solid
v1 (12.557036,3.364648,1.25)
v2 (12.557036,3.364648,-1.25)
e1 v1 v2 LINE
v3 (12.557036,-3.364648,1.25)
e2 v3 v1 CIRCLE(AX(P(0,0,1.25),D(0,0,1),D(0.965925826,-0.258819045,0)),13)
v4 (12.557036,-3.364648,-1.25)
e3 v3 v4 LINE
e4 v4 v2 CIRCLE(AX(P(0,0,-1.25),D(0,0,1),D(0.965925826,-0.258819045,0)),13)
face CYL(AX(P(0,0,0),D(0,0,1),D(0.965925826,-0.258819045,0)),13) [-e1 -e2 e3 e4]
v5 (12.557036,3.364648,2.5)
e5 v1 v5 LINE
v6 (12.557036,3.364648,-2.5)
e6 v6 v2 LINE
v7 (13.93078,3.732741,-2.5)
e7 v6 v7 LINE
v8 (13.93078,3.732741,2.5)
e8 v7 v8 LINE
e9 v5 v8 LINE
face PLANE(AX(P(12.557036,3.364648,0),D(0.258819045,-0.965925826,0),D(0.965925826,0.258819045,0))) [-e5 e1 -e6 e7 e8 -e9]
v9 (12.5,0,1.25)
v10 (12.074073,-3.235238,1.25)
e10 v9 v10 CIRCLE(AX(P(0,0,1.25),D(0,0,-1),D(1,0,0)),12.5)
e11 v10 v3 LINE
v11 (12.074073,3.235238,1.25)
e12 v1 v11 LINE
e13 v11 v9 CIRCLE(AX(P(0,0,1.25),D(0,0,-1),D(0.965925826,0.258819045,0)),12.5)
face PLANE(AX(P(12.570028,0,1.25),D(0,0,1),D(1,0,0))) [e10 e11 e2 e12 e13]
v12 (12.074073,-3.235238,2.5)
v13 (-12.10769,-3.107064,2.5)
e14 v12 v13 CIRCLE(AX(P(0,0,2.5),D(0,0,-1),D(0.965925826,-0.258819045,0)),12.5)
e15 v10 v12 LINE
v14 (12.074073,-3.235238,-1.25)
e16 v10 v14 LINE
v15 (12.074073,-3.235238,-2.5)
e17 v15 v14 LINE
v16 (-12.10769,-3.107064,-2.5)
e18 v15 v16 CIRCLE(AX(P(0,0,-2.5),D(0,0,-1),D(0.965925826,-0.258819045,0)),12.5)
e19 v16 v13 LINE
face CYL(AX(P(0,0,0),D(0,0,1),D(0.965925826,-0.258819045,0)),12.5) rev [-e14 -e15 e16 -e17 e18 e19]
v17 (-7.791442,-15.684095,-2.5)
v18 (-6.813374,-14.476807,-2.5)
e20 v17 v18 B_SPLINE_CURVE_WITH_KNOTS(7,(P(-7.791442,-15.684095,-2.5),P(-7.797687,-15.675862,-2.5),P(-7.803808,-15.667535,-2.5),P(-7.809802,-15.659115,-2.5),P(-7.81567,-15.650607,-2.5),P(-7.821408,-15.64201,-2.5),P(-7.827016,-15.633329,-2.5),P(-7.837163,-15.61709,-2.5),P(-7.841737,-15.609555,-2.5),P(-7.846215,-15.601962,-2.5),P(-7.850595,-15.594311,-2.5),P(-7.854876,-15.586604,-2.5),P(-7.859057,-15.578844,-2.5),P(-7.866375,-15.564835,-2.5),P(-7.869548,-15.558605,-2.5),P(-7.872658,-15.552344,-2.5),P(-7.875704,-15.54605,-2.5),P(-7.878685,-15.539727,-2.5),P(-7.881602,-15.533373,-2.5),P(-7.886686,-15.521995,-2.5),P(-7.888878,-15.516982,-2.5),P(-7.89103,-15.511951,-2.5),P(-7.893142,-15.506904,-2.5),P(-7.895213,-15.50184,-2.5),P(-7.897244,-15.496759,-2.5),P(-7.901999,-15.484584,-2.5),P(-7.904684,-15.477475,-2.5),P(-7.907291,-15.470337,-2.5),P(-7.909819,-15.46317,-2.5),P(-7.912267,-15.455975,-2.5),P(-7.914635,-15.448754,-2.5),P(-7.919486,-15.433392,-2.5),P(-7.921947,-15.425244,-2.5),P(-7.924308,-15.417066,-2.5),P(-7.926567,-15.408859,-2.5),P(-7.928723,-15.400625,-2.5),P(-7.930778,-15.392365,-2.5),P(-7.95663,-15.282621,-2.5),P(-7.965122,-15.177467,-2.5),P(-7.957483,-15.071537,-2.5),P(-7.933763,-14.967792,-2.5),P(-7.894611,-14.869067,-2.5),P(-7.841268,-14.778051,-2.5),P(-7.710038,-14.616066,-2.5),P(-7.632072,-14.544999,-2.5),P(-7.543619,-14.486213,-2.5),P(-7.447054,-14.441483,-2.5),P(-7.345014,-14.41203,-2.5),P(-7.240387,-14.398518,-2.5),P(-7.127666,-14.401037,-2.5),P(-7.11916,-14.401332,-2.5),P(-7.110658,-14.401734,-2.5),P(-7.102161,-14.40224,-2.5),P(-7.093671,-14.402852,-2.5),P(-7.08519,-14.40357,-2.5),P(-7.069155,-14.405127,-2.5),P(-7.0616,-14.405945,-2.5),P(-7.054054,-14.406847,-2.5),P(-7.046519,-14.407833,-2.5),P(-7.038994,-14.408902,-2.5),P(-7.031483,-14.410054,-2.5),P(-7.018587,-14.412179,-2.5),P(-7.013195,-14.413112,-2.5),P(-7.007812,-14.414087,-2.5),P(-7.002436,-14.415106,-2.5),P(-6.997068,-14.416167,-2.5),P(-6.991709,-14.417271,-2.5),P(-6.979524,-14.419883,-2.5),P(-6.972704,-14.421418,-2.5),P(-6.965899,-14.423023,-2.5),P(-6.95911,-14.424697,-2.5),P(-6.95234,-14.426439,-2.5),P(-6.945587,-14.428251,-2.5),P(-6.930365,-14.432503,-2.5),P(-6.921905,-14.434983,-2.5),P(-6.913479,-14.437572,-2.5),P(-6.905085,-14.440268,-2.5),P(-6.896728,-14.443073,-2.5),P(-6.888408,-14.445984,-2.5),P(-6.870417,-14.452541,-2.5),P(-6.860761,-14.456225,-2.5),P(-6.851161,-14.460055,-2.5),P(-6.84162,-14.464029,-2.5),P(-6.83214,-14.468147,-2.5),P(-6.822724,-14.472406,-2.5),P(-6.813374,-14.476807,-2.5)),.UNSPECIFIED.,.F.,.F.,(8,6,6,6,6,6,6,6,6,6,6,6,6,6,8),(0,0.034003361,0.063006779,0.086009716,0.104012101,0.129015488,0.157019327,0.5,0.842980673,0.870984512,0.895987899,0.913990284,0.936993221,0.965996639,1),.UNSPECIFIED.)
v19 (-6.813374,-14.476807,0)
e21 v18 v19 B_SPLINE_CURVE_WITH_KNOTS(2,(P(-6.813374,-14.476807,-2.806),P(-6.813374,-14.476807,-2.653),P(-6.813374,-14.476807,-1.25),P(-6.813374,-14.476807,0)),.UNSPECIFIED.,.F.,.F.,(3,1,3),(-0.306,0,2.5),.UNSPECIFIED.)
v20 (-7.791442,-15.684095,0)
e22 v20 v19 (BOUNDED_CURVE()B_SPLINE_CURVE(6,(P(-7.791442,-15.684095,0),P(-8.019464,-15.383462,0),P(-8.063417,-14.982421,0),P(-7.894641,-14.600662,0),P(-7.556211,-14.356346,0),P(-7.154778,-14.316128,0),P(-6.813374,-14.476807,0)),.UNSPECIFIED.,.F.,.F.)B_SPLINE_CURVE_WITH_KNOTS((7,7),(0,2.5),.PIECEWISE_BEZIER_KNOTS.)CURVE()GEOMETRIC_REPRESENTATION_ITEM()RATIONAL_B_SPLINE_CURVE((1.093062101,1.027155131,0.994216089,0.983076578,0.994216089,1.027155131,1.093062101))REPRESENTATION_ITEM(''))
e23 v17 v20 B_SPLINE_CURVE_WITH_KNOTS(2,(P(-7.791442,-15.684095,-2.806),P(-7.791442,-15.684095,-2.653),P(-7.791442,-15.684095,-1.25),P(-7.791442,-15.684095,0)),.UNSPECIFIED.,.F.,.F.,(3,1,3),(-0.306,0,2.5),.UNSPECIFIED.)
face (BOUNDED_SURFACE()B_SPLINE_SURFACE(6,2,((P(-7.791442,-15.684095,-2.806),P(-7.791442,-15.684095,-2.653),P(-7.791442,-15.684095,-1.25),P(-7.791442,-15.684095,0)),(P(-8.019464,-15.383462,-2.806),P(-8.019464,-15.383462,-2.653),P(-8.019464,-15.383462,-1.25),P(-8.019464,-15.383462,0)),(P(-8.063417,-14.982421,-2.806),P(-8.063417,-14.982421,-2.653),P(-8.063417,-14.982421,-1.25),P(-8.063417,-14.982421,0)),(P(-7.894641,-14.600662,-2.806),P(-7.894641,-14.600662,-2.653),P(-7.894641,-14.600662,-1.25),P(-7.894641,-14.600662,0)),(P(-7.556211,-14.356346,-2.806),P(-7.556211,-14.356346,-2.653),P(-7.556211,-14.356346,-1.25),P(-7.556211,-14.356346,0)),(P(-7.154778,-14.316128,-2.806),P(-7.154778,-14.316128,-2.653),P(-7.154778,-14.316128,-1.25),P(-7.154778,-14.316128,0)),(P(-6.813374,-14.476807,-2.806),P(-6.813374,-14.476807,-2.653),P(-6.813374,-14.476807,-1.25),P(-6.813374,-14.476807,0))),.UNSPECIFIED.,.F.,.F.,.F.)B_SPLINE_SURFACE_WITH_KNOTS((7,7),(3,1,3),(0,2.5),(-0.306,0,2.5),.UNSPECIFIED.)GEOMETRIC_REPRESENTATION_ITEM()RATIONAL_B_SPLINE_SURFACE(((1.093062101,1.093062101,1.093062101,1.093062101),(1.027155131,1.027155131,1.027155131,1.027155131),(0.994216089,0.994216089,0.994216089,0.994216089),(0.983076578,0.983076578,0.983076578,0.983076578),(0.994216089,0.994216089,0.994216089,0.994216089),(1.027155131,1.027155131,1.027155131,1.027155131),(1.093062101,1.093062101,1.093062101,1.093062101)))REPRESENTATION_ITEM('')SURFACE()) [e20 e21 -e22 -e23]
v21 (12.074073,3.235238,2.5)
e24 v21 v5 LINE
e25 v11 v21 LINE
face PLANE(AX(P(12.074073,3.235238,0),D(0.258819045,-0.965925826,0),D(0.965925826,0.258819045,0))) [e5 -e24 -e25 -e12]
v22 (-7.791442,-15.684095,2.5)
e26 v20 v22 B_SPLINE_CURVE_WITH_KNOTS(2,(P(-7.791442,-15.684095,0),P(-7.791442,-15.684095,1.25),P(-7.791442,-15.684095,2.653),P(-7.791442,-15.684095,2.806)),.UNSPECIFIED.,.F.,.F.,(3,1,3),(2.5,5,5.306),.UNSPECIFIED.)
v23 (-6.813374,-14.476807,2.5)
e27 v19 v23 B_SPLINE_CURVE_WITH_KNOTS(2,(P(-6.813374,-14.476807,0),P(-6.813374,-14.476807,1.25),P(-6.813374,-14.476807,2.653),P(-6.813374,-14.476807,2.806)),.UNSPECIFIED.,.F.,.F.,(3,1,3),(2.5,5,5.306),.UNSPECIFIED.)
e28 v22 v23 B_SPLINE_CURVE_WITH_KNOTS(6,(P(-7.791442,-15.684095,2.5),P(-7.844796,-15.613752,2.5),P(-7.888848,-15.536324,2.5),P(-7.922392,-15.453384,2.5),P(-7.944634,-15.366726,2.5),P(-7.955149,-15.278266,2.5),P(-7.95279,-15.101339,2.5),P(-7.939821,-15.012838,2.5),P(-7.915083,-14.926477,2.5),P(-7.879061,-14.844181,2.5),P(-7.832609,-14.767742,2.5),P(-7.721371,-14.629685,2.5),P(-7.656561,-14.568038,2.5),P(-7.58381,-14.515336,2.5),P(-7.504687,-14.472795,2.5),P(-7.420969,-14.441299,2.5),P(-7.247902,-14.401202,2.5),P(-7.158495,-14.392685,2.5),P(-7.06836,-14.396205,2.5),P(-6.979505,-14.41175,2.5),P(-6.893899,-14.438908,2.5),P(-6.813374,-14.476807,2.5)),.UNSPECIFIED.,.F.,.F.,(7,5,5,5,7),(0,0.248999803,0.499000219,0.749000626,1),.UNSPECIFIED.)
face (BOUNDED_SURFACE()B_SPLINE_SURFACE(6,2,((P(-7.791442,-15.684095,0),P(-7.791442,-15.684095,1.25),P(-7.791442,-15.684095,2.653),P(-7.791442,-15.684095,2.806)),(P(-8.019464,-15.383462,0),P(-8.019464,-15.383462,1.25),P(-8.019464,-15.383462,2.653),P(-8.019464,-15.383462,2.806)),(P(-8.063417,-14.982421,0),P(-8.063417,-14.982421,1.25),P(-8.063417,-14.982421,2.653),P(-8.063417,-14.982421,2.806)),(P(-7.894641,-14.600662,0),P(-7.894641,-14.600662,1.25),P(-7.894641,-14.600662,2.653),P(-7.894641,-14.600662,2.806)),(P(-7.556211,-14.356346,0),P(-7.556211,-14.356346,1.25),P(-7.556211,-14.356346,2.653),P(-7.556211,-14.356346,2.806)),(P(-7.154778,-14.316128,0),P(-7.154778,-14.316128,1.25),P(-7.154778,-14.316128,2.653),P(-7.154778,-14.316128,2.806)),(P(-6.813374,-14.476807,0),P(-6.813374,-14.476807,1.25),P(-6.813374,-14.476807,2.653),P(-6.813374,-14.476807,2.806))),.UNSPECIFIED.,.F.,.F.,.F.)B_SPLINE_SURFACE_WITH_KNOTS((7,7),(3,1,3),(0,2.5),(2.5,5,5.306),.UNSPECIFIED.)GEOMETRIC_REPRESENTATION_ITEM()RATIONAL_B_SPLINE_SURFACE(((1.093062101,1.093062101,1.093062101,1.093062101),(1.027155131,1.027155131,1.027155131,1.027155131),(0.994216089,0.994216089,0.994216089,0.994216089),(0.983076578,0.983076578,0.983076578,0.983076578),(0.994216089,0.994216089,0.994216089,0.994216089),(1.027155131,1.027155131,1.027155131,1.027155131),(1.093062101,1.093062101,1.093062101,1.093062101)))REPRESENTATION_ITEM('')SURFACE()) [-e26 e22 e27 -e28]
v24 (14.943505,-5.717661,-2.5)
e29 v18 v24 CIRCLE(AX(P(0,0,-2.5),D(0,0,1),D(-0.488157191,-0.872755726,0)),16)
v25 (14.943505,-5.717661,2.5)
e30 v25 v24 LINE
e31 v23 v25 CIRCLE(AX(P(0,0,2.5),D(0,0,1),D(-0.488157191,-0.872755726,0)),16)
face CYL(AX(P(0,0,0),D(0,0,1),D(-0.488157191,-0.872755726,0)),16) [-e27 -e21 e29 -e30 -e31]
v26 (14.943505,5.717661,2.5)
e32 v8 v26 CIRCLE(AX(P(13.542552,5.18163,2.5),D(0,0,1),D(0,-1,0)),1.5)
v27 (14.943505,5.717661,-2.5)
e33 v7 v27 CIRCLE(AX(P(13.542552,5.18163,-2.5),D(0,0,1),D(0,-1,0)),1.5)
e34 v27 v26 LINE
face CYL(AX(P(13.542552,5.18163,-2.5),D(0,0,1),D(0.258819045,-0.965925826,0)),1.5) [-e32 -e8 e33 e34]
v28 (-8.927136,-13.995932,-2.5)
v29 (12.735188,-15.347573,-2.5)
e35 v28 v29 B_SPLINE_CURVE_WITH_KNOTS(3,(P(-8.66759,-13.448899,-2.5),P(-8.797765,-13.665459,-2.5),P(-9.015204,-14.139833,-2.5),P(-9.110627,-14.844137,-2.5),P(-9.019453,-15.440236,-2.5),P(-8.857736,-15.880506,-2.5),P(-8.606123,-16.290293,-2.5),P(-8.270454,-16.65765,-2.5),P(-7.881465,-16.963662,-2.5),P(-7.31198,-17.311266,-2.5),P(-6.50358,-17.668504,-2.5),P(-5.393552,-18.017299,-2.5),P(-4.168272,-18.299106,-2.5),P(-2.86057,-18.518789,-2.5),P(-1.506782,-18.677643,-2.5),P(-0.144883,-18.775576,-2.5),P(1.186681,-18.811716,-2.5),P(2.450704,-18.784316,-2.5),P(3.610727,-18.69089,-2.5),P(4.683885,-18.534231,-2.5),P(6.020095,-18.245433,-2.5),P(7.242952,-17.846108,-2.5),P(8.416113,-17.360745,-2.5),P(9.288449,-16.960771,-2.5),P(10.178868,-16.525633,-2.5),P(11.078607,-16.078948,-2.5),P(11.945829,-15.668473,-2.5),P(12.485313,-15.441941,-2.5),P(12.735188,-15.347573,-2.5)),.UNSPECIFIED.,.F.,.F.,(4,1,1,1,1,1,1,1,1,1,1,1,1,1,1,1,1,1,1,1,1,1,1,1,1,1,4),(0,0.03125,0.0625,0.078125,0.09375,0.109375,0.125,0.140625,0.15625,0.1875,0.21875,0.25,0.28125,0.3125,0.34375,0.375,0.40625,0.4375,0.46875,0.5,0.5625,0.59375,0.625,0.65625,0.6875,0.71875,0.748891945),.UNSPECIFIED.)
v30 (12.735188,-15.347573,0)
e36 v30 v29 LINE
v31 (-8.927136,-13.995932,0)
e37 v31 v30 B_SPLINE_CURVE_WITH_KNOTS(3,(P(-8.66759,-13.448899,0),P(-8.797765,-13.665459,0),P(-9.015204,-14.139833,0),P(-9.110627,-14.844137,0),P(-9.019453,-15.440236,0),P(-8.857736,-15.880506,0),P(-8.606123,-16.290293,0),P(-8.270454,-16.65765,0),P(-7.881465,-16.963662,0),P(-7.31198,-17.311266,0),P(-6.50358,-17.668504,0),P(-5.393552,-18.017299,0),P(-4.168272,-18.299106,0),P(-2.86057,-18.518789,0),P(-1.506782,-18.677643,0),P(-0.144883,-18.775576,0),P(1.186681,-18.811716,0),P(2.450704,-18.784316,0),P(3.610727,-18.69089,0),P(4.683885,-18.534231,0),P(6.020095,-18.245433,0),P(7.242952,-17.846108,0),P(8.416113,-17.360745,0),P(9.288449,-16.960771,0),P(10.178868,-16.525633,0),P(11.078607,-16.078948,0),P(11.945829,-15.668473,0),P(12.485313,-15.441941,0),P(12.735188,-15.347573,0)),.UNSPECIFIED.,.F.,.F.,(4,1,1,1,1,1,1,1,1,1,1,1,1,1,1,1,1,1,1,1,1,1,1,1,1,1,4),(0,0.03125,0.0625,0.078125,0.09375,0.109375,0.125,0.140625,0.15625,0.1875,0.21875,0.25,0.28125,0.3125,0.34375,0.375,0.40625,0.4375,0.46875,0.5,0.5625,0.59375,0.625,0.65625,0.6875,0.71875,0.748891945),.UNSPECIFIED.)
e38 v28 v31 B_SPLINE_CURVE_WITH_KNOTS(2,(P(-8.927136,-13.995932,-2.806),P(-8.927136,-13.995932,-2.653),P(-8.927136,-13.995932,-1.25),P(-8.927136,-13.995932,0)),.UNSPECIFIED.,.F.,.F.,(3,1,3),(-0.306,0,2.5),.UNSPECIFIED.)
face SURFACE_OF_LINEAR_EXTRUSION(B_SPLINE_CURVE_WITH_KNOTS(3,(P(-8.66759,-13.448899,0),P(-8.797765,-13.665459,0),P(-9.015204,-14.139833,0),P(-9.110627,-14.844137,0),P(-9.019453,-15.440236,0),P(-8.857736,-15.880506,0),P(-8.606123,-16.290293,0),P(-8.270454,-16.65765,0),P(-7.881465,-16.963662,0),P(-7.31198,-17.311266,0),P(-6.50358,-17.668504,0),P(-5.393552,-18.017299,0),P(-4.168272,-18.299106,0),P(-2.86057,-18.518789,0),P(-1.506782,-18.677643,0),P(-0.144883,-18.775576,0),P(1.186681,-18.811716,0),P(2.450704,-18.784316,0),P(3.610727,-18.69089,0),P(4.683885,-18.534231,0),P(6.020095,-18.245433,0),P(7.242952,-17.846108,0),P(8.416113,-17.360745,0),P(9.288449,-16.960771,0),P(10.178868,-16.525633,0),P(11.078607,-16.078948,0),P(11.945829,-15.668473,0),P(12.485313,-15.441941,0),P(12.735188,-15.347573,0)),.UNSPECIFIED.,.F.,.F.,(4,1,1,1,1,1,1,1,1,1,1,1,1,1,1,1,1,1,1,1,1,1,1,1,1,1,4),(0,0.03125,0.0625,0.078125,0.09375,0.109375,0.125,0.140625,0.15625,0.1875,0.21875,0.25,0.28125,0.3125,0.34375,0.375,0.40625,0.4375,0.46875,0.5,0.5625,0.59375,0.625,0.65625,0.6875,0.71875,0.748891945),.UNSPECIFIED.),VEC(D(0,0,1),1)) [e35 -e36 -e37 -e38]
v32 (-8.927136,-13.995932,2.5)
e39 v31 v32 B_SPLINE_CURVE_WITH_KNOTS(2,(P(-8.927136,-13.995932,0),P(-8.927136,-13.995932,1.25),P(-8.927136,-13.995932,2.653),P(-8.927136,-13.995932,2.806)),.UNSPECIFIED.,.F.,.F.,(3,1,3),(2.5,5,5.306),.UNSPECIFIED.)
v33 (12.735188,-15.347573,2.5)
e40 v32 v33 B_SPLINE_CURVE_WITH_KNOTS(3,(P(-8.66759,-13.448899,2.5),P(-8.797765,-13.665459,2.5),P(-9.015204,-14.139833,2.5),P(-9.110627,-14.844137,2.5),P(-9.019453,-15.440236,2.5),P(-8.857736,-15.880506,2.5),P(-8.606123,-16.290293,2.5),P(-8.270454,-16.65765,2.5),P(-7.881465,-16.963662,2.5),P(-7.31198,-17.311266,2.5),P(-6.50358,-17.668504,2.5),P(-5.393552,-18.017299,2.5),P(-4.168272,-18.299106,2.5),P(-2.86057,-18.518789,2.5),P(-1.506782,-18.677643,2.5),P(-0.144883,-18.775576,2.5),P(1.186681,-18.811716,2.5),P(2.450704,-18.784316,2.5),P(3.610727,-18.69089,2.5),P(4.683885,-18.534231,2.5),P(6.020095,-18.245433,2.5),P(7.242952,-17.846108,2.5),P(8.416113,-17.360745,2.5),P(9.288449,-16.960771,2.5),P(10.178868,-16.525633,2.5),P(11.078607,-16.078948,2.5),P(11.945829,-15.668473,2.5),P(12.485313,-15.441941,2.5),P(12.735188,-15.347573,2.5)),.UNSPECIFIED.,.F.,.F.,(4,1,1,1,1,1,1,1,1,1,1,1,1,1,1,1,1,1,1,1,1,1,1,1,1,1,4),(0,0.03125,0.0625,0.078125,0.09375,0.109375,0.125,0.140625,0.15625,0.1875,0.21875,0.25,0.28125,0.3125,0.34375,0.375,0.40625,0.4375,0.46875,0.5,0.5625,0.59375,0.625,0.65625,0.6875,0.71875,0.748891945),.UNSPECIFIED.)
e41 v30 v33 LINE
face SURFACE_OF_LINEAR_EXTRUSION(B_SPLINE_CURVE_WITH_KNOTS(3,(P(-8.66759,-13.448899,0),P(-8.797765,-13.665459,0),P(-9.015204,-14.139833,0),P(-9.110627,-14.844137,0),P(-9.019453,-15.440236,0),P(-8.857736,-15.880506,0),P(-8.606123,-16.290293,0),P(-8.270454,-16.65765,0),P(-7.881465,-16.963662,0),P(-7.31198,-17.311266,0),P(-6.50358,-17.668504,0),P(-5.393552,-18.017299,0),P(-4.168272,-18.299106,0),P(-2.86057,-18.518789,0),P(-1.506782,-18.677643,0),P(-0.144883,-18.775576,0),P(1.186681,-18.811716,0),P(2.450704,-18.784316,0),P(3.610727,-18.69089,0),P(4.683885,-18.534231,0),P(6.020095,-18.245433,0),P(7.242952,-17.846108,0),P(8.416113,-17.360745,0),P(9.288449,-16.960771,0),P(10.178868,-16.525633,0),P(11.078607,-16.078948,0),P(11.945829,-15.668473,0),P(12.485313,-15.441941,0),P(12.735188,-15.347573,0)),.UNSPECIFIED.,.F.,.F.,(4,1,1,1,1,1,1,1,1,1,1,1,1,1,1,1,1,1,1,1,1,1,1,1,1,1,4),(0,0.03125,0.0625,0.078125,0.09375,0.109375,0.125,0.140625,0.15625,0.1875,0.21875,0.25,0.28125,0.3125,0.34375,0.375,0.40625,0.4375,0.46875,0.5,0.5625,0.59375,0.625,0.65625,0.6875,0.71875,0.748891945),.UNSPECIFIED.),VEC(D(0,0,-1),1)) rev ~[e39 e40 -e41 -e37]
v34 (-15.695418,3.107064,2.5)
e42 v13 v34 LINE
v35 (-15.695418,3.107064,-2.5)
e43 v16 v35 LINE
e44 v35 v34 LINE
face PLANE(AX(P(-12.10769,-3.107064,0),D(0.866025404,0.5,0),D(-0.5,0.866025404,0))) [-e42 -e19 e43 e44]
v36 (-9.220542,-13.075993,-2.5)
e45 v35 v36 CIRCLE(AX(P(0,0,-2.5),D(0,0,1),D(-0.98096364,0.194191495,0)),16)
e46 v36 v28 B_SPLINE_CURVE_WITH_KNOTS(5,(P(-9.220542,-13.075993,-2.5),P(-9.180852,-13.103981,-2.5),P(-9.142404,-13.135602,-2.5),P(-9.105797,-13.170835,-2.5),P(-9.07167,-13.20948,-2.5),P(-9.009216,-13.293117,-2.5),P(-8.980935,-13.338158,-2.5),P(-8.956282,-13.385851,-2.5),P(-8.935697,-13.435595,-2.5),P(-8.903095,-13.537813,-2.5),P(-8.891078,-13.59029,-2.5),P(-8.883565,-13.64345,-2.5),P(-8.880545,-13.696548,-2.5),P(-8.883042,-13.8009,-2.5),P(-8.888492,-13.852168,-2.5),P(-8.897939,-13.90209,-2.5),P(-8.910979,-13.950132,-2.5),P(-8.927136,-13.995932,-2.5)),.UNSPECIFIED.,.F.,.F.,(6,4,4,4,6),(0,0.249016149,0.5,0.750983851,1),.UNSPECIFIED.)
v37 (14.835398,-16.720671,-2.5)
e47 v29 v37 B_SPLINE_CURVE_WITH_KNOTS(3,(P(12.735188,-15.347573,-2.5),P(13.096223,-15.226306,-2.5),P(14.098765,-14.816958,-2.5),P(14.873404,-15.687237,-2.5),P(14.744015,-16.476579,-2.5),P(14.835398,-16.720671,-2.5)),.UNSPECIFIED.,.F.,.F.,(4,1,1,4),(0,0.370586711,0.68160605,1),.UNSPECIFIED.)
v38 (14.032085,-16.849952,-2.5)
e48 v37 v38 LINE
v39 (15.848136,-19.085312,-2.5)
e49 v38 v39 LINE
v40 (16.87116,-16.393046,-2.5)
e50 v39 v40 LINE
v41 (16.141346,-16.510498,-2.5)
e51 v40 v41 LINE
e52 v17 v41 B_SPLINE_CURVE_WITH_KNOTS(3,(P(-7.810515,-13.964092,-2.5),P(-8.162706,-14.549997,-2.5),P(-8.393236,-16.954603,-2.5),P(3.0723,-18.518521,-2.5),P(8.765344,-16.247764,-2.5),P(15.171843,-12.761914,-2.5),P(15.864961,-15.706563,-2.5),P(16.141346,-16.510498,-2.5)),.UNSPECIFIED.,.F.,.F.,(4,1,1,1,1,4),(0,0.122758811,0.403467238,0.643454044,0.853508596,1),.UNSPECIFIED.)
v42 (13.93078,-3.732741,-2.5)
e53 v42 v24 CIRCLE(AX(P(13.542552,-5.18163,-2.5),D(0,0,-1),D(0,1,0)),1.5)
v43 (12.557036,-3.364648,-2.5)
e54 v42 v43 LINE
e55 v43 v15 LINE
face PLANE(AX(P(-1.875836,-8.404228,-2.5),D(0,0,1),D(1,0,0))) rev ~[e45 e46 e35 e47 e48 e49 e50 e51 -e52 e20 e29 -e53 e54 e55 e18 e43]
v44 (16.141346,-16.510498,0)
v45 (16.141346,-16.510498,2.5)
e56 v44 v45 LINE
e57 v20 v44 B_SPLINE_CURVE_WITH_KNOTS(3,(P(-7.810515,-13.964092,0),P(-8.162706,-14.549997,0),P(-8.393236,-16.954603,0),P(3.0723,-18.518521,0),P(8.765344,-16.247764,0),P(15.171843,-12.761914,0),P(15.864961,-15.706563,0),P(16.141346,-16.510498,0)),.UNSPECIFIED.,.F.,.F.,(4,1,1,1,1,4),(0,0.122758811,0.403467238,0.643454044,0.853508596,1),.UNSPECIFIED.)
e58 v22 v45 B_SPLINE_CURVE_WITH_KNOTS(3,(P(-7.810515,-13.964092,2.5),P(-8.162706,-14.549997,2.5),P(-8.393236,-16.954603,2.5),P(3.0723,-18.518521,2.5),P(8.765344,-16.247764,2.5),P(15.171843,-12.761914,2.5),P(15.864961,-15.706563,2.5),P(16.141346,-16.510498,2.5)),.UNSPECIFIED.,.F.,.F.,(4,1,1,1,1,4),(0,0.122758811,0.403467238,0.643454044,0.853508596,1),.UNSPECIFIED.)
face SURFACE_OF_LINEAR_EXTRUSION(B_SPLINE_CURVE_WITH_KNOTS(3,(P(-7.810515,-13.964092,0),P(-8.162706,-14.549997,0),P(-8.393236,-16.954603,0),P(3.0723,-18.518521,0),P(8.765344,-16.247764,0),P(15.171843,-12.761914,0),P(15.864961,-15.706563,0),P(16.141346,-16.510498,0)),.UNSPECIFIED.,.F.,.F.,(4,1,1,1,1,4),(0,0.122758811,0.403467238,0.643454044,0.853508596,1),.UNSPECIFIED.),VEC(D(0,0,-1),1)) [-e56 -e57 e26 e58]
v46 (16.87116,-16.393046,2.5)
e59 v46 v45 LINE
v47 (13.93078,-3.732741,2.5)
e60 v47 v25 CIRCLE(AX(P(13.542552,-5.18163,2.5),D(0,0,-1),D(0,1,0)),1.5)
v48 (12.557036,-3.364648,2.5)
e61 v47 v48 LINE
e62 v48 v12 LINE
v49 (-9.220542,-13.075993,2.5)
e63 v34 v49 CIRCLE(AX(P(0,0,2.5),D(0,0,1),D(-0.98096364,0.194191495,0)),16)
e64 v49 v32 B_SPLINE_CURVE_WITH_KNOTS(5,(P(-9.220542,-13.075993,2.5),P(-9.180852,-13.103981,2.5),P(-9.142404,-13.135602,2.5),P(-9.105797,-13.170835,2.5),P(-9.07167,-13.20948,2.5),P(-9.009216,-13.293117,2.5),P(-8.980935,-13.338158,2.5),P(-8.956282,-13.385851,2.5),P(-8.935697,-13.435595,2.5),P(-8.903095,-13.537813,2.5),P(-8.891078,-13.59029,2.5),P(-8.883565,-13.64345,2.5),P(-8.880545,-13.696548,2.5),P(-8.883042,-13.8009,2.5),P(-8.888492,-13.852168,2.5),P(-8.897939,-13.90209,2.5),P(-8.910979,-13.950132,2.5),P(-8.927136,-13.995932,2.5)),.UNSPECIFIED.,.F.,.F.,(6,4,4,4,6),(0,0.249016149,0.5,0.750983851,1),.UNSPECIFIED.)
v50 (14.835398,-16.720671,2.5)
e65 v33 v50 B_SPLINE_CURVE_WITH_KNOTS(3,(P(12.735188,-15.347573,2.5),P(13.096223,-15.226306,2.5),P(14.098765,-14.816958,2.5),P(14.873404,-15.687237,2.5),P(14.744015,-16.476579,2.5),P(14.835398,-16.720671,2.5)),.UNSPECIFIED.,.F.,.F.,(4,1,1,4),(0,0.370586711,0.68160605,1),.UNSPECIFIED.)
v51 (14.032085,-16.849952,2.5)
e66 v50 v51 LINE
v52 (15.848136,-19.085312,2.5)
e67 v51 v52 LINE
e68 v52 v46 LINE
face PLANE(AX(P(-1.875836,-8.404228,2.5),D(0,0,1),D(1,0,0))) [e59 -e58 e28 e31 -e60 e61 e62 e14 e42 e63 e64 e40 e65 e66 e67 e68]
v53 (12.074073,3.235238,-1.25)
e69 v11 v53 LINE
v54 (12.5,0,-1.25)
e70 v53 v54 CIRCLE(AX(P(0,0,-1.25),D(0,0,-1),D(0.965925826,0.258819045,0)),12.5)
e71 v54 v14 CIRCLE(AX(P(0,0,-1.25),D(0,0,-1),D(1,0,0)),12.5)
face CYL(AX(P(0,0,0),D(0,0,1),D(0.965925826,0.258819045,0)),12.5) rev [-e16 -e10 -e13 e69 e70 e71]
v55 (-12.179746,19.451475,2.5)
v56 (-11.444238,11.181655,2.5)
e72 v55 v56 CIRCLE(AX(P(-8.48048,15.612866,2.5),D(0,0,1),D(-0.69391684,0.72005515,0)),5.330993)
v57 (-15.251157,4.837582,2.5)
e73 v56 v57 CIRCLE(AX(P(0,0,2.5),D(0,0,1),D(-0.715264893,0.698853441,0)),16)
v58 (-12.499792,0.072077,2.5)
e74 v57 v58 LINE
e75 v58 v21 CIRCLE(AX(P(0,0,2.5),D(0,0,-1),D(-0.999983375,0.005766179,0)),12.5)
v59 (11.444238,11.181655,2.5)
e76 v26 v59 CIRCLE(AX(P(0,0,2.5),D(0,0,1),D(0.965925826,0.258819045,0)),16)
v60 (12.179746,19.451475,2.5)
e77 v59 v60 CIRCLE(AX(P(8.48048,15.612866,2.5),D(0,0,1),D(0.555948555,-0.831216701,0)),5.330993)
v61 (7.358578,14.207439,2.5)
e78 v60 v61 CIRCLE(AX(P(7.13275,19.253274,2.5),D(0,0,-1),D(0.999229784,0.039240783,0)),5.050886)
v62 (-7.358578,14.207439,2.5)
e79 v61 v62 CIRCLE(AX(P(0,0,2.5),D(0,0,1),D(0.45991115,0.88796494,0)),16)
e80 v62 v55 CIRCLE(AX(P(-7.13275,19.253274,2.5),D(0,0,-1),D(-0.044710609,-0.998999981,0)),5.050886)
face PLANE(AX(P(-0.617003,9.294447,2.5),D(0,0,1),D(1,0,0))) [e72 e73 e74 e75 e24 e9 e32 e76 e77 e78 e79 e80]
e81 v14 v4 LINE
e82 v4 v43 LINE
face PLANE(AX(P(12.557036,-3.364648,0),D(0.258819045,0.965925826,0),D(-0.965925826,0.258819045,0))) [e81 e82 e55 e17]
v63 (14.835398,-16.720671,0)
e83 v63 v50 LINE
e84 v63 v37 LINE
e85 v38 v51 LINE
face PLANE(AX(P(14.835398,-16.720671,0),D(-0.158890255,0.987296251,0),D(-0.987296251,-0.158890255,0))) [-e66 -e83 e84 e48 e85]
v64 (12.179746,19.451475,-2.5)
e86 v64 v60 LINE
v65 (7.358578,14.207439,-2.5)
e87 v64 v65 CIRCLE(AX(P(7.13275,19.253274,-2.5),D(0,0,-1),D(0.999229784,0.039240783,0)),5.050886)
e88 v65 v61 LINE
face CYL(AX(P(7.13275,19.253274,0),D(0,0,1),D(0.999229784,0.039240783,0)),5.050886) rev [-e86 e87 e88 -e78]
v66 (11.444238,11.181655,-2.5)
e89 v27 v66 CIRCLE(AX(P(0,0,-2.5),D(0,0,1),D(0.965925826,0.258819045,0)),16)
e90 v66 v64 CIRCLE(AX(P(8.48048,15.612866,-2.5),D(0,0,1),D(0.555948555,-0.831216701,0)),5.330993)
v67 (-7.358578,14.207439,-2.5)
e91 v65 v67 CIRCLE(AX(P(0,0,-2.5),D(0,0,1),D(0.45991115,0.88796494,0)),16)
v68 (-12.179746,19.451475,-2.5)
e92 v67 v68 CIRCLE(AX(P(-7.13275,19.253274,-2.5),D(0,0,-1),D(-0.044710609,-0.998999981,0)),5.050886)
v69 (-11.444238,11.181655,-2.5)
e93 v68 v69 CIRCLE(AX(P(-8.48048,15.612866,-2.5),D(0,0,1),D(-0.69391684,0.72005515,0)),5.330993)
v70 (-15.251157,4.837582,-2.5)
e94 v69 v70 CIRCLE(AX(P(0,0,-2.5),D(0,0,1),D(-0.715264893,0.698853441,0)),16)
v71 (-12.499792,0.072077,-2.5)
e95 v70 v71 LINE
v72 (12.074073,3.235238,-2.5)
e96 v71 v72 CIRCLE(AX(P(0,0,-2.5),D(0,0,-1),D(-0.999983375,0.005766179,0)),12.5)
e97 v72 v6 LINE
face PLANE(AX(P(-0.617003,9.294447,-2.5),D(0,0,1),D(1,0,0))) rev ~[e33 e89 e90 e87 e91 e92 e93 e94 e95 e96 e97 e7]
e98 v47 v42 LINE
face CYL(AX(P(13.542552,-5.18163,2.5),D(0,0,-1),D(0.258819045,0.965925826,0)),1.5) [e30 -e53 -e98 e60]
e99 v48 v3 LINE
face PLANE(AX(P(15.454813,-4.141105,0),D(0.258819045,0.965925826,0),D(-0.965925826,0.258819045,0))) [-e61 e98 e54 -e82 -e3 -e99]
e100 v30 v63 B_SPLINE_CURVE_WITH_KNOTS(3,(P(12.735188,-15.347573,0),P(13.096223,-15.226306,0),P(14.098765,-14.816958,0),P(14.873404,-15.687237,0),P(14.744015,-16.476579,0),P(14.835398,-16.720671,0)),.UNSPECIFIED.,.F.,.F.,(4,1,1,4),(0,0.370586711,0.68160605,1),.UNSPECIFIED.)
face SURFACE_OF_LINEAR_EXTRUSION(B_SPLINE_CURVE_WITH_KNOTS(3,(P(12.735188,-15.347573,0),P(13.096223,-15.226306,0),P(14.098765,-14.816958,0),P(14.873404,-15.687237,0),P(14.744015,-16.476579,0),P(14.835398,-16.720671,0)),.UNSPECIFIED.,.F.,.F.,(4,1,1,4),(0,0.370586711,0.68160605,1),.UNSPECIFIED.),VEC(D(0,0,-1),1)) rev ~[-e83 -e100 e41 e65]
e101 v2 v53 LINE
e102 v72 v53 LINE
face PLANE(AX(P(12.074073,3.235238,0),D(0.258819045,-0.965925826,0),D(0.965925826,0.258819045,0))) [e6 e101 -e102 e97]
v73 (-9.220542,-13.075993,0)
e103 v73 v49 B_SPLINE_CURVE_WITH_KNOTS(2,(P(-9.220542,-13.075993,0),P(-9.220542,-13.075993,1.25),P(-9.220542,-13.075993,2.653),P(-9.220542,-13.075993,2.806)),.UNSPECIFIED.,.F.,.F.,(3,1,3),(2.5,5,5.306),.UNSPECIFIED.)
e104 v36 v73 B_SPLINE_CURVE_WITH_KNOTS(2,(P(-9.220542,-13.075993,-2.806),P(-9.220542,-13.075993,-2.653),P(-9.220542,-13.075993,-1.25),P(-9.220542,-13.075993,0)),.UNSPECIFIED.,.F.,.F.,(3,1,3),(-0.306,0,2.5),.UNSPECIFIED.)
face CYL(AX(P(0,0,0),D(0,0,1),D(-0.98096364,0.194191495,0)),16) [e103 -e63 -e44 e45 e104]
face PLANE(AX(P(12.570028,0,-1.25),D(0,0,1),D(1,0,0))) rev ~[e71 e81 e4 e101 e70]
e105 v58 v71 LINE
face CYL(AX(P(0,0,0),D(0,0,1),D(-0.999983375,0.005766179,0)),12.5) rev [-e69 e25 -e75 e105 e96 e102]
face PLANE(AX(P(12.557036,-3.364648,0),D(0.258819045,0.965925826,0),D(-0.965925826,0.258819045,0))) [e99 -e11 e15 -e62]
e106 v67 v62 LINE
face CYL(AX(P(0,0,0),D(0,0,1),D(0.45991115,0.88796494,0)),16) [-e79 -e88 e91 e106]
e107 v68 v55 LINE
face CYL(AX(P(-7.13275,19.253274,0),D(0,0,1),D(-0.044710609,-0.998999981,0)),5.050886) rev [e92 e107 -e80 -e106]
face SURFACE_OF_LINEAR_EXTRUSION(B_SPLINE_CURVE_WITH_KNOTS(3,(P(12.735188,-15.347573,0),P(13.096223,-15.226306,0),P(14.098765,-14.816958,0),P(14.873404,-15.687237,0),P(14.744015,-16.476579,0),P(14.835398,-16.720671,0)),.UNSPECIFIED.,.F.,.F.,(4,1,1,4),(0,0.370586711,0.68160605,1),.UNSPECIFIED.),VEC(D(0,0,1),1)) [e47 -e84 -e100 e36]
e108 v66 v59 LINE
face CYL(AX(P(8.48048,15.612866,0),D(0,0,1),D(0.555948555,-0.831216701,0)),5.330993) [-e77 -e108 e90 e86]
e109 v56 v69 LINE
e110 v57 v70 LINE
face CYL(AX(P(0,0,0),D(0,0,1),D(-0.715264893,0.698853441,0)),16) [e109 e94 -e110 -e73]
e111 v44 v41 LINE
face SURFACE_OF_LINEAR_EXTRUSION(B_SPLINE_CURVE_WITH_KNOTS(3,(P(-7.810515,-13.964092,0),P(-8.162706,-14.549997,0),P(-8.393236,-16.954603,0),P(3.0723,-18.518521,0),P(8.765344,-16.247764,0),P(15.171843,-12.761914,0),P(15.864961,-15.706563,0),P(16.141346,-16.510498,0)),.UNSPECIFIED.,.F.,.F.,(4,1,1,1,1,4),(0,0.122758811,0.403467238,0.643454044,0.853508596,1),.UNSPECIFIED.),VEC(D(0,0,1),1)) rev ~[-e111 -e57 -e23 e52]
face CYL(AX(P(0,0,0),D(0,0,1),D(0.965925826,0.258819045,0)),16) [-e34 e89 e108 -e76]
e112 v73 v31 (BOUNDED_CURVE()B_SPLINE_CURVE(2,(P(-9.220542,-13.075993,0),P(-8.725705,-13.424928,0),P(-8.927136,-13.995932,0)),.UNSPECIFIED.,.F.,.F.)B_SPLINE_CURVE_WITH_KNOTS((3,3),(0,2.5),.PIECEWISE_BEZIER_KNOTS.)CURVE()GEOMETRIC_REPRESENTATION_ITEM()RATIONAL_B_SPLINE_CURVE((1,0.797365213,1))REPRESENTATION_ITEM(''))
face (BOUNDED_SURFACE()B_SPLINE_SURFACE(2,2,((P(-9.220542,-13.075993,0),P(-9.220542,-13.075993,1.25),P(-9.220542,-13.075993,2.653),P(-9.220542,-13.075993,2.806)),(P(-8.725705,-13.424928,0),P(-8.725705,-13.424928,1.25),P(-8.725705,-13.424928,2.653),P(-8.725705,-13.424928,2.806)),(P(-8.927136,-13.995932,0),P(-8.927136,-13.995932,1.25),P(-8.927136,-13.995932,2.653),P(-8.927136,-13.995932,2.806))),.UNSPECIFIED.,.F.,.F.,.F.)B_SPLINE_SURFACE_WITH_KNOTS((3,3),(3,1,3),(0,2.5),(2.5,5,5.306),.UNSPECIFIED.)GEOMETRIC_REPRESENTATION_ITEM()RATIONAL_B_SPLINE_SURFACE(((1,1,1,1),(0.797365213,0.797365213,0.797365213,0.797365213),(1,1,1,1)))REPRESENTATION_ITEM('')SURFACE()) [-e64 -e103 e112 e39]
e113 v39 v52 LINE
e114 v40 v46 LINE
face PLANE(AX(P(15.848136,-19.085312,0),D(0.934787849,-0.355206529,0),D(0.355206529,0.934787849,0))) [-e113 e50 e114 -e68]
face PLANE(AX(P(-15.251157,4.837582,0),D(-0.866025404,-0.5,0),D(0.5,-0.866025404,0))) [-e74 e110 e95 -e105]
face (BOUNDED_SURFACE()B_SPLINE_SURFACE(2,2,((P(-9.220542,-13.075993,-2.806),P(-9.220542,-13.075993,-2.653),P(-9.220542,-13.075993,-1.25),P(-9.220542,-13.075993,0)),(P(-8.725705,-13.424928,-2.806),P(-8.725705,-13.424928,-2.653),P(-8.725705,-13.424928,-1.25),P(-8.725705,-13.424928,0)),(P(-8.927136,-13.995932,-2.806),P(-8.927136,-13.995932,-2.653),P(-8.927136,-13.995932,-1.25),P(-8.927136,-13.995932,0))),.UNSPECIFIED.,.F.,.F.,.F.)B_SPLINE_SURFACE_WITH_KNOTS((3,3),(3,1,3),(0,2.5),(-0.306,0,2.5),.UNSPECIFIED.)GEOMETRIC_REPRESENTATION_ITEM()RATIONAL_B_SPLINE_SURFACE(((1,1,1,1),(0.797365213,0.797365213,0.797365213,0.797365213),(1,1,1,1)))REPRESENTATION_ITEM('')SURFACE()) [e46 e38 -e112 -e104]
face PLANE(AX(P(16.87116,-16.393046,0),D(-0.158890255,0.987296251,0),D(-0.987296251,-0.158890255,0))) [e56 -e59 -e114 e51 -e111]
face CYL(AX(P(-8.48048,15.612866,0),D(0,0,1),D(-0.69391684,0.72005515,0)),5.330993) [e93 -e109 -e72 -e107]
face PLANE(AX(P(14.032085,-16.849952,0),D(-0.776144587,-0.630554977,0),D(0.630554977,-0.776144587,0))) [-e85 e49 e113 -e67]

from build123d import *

# Parameters (mm, degrees)
F1_DEPTH = 2.5
F2_DEPTH = 1.25
F3_R     = 1.5
F4_DEPTH = 2.5
F5_R     = 0.8


# Not quite as in the source:
# - ends of sketch curves that miss each other by under 0.0002 mm in the source are joined
# - the dataset's text gives a spline's control points without its knots; the knots are read off the source's solid


with BuildPart() as f1:
    # F0 (on Top) → F1 (new body, symmetric)
    with BuildSketch(Plane.XY):
        with BuildLine():
            ThreePointArc((-12.4997921931, 0.0720772397), (-1.5958401687, 12.3977132632), (12.0740728286, 3.2352380638))
            Line((12.0740728286, 3.2352380638), (12.5570357418, 3.3646475863))
            Line((12.5570357418, 3.3646475863), (15.4548132206, 4.1411047216))
            ThreePointArc((15.4548132206, 4.1411047216), (13.9025925761, 7.9194646071), (11.4442382915, 11.1816550621))
            ThreePointArc((11.4442382915, 11.1816550621), (9.5223590052, 12.8578644796), (7.3585783975, 14.2074390362))
            ThreePointArc((7.3585783975, 14.2074390362), (0, 16), (-7.3585783975, 14.2074390362))
            ThreePointArc((-7.3585783975, 14.2074390362), (-9.5223590052, 12.8578644796), (-11.4442382915, 11.1816550621))
            ThreePointArc((-11.4442382915, 11.1816550621), (-13.7194334915, 8.2326875729), (-15.2511574536, 4.8375816609))
            Line((-15.2511574536, 4.8375816609), (-12.4997921931, 0.0720772397))
        make_face()
        with BuildLine():
            ThreePointArc((-12.1797463165, 19.4514751915), (-13.7905135345, 15.1405977877), (-11.4442382915, 11.1816550621))
            ThreePointArc((-11.4442382915, 11.1816550621), (-9.5223590052, 12.8578644796), (-7.3585783975, 14.2074390362))
            ThreePointArc((-7.3585783975, 14.2074390362), (-10.8510358044, 15.8348237051), (-12.1797463165, 19.4514751915))
        make_face()
        with BuildLine():
            ThreePointArc((7.3585783975, 14.2074390362), (9.5223590052, 12.8578644796), (11.4442382915, 11.1816550621))
            ThreePointArc((11.4442382915, 11.1816550621), (13.7905135345, 15.1405977877), (12.1797463165, 19.4514751915))
            ThreePointArc((12.1797463165, 19.4514751915), (10.8510358044, 15.8348237051), (7.3585783975, 14.2074390362))
        make_face()
    extrude(amount=F1_DEPTH, both=True)



with BuildPart() as f1b:
    # F0 (on Top) → F1, piece 2 (new body, symmetric)
    with BuildSketch(Plane.XY):
        with BuildLine():
            Line((12.5570357418, -3.3646475863), (12.0740728286, -3.2352380638))
            ThreePointArc((12.0740728286, -3.2352380638), (-0.0662546533, -12.4998244116), (-12.1076898624, -3.107063919))
            Line((-12.1076898624, -3.107063919), (-15.6954182424, 3.107063919))
            ThreePointArc((-15.6954182424, 3.107063919), (-14.7280011146, -6.2518783712), (-8.6675896137, -13.4488992222))
            ThreePointArc((-8.6675896137, -13.4488992222), (-8.2430782578, -13.7131929483), (-7.8105150545, -13.9640916133))
            ThreePointArc((-7.8105150545, -13.9640916133), (6.2234710156, -14.740027426), (15.4548132206, -4.1411047216))
            Line((15.4548132206, -4.1411047216), (12.5570357418, -3.3646475863))
        make_face()
        with BuildLine():
            ThreePointArc((-7.8105150545, -13.9640916133), (-8.2430782578, -13.7131929483), (-8.6675896137, -13.4488992222))
            add(Edge.make_bspline(
                [(-8.6675896137, -13.4488992222), (-8.797764652, -13.6654585416), (-9.0152035334, -14.1398334202), (-9.1106271715, -14.8441369677), (-9.019453346, -15.4402355626), (-8.8577356601, -15.8805060204), (-8.606122993, -16.2902925258), (-8.2704537018, -16.6576498092), (-7.8814651413, -16.9636616263), (-7.3119803281, -17.3112660682), (-6.5035804076, -17.6685037974), (-5.3935521754, -18.017298843), (-4.1682718306, -18.2991057591), (-2.8605703232, -18.5187890962), (-1.5067823109, -18.6776427369), (-0.1448831469, -18.7755760581), (1.1866806091, -18.811715906), (2.4507043421, -18.7843156845), (3.6107265904, -18.6908897447), (4.6838851631, -18.5342313543), (6.0200948318, -18.2454330252), (7.2429524692, -17.8461078269), (8.4161128097, -17.360744608), (9.2884492722, -16.9607714916), (10.1788682347, -16.5256334939), (11.0786073367, -16.0789478737), (11.9458288341, -15.6684730299), (12.4853133495, -15.4419413174), (12.735188331, -15.3475727395)],
                knots=[0, 0, 0, 0, 0.03125, 0.0625, 0.078125, 0.09375, 0.109375, 0.125, 0.140625, 0.15625, 0.1875, 0.21875, 0.25, 0.28125, 0.3125, 0.34375, 0.375, 0.40625, 0.4375, 0.46875, 0.5, 0.5625, 0.59375, 0.625, 0.65625, 0.6875, 0.71875, 0.7488919453, 0.7488919453, 0.7488919453, 0.7488919453], degree=3))
            add(Edge.make_bspline(
                [(12.735188331, -15.3475727395), (13.0962225988, -15.2263056252), (14.0987647195, -14.8169575852), (14.8734039357, -15.6872366698), (14.744015393, -16.4765788546), (14.8353977892, -16.7206706709)],
                knots=[0, 0, 0, 0, 0.3705867105, 0.6816060498, 1, 1, 1, 1], degree=3))
            Line((14.8353977892, -16.7206706709), (16.1413460697, -16.5104982377))
            add(Edge.make_bspline(
                [(-7.8105150545, -13.9640916133), (-8.1627060189, -14.5499968418), (-8.3932358627, -16.9546025127), (3.0722998689, -18.5185205906), (8.7653437405, -16.2477641355), (15.1718434378, -12.7619138207), (15.864960823, -15.7065625014), (16.1413460697, -16.5104982377)],
                knots=[0, 0, 0, 0, 0.1227588113, 0.403467238, 0.6434540436, 0.8535085955, 1, 1, 1, 1], degree=3))
        make_face()
        Polygon((16.8711597868, -16.3930458647), (16.1413460697, -16.5104982377), (14.8353977892, -16.7206706709), (14.0320850357, -16.8499515915), (15.8481355757, -19.0853122622), align=None)
    extrude(amount=F1_DEPTH, both=True)


with BuildPart() as f1_1:
    add(f1.part)

    add(f1b.part)  # F2 merges F1b
    # F0 (on Top) → F2 (join, symmetric)
    with BuildSketch(Plane.XY):
        with BuildLine():
            ThreePointArc((12.0740728286, 3.2352380638), (12.3930607672, 1.6315774028), (12.5, 0))
            ThreePointArc((12.5, 0), (12.3930607672, -1.6315774028), (12.0740728286, -3.2352380638))
            Line((12.0740728286, -3.2352380638), (12.5570357418, -3.3646475863))
            ThreePointArc((12.5570357418, -3.3646475863), (13, 0), (12.5570357418, 3.3646475863))
            Line((12.5570357418, 3.3646475863), (12.0740728286, 3.2352380638))
        make_face()
    extrude(amount=F2_DEPTH, both=True)

    # F3
    f3_edges = [f1_1.edges().sort_by_distance(p)[0] for p in [
        (15.454813, -4.141105, 0),
        (15.454813, 4.141105, 0),
    ]]
    fillet(f3_edges, radius=F3_R)

    # F0 (on Top) → F4 (cut, symmetric)
    with BuildSketch(Plane.XY):
        with BuildLine():
            ThreePointArc((12.0740728286, -3.2352380638), (12.3930607672, -1.6315774028), (12.5, 0))
            ThreePointArc((12.5, 0), (12.3930607672, 1.6315774028), (12.0740728286, 3.2352380638))
            ThreePointArc((12.0740728286, 3.2352380638), (-1.5958401687, 12.3977132632), (-12.4997921931, 0.0720772397))
            ThreePointArc((-12.4997921931, 0.0720772397), (-12.4059976586, -1.5301052563), (-12.1076898624, -3.107063919))
            ThreePointArc((-12.1076898624, -3.107063919), (-0.0662546533, -12.4998244116), (12.0740728286, -3.2352380638))
        make_face()
    extrude(amount=F4_DEPTH, both=True, mode=Mode.SUBTRACT)

    # F5
    f5_edges = [f1_1.edges().sort_by_distance(p)[0] for p in [
        (-7.810515, -13.964092, 1.25),
        (-7.810515, -13.964092, -1.25),
        (-8.66759, -13.448899, 1.25),
        (-8.66759, -13.448899, -1.25),
    ]]
    fillet(f5_edges, radius=F5_R)


solid = f1_1.part
